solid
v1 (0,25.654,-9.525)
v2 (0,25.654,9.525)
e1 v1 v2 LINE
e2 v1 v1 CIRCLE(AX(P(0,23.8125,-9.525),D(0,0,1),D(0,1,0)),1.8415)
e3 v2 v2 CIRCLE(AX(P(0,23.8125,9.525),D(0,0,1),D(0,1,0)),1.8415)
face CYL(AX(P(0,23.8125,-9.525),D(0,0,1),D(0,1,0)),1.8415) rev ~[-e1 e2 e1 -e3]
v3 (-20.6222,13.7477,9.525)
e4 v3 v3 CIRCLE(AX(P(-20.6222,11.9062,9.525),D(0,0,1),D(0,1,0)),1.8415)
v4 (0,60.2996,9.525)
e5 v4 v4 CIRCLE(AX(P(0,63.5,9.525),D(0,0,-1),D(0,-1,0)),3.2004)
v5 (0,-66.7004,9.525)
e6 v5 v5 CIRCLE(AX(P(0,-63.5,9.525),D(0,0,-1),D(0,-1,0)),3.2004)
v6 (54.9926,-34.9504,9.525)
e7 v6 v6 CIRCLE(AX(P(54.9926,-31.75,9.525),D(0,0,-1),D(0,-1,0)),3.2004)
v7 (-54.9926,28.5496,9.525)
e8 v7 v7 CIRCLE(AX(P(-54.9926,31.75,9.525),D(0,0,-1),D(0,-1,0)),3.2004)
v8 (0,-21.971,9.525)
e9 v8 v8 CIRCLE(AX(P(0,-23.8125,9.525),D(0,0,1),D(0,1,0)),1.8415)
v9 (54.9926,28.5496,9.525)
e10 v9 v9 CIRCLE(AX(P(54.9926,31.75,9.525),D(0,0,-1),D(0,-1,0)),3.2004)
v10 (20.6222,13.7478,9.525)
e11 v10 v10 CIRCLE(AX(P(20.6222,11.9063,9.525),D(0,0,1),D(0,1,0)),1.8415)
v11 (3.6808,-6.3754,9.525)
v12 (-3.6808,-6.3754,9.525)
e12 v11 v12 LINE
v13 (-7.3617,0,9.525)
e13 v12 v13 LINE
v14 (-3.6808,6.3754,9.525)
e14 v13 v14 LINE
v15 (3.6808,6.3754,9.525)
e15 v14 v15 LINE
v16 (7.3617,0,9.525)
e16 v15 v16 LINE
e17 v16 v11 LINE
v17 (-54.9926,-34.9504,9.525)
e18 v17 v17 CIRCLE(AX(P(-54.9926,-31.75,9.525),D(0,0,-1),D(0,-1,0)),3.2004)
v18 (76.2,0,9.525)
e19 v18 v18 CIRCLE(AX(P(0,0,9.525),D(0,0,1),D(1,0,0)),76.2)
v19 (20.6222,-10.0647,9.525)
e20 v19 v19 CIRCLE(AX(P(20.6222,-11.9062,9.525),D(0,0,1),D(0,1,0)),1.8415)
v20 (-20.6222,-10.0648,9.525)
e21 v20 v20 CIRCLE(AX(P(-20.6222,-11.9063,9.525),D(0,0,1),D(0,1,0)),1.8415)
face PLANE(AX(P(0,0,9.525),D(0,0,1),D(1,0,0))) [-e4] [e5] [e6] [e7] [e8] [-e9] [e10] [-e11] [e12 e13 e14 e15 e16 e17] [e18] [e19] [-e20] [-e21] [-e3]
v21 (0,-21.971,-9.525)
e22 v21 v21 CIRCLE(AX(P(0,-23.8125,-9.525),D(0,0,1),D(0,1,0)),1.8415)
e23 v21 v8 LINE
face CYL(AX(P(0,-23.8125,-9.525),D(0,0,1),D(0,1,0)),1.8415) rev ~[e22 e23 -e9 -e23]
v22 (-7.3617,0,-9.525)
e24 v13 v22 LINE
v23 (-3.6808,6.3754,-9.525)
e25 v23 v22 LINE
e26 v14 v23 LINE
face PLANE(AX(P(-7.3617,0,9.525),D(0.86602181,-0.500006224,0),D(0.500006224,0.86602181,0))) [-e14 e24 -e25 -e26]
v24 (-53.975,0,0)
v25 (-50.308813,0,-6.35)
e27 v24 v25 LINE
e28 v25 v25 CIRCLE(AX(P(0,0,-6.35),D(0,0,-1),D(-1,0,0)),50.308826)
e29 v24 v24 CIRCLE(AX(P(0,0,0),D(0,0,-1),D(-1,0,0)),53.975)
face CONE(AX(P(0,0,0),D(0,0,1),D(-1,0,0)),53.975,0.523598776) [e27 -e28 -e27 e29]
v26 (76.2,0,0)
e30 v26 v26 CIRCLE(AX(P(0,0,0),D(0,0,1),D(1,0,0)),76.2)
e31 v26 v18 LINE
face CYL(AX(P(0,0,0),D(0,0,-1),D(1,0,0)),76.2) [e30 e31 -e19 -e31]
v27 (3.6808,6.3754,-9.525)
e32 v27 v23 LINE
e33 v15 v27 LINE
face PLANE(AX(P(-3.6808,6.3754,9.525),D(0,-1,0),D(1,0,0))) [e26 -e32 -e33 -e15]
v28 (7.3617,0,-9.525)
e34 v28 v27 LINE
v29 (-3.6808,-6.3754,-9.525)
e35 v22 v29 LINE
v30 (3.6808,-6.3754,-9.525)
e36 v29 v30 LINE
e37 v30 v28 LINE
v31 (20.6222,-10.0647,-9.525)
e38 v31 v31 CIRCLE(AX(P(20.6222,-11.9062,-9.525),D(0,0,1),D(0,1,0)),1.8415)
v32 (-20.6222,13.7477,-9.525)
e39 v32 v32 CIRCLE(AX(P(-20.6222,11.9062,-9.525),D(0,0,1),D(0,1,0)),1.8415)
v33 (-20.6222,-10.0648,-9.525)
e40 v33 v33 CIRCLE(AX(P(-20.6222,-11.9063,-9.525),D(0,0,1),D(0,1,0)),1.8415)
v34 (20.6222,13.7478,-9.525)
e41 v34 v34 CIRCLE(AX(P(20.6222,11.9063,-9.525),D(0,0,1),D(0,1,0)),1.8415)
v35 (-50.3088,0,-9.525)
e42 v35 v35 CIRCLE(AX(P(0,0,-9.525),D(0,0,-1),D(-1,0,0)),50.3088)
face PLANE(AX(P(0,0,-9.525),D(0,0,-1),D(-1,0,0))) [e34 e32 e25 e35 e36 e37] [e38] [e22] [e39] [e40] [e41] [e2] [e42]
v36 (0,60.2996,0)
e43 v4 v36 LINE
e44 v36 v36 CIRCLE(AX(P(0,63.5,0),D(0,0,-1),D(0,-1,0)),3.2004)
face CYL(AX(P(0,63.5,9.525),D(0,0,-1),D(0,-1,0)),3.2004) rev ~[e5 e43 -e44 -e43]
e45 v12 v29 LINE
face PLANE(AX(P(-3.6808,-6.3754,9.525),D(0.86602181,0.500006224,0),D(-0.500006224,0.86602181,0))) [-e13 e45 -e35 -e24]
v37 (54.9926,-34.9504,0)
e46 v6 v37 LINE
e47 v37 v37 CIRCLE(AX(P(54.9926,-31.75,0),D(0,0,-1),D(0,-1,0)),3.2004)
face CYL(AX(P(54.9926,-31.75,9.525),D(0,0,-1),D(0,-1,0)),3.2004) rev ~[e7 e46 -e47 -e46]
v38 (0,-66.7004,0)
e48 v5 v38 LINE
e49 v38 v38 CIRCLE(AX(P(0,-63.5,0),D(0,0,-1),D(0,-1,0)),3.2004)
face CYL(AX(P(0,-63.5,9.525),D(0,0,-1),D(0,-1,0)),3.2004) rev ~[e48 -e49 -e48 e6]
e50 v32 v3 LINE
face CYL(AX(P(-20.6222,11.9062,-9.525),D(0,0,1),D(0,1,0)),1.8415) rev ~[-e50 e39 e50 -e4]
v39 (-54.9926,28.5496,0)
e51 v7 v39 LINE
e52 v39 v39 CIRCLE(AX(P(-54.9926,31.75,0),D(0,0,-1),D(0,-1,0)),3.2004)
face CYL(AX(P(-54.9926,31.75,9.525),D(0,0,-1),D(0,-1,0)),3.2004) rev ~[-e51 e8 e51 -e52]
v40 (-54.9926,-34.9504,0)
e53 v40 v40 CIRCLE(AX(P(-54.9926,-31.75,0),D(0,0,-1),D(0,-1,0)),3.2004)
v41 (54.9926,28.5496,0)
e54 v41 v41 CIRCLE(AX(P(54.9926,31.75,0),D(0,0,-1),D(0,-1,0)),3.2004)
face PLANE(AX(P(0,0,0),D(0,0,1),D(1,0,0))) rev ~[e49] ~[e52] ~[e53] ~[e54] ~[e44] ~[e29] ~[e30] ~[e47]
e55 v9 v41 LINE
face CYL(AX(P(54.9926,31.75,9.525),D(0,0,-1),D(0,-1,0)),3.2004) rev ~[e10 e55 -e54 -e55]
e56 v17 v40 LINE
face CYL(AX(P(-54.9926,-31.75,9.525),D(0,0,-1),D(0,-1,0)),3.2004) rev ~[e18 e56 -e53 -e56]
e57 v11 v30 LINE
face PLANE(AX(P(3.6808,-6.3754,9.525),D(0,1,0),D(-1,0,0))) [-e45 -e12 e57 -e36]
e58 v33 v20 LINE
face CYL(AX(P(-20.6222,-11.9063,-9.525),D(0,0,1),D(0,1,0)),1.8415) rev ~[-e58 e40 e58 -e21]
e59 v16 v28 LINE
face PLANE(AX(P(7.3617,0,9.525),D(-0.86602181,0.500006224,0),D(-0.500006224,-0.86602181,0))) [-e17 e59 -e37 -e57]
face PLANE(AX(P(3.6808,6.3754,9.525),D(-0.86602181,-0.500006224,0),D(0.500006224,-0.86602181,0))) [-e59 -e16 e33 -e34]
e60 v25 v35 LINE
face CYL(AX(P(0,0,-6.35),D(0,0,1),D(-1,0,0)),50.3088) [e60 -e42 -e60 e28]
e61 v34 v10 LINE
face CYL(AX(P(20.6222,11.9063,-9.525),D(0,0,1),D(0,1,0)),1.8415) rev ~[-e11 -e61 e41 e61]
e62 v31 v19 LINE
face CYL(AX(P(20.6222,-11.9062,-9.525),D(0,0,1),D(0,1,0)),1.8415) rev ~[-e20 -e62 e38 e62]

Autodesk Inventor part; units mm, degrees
ref_plane "YZ Plane" through (0, 0, 0) normal (1, 0, 0) x (0, 1, 0)
ref_plane "XZ Plane" through (0, 0, 0) normal (0, 1, 0) x (-1, 0, 0)
ref_plane "XY Plane" through (0, 0, 0) normal (0, 0, 1) x (1, 0, 0)
sketch "Sketch1" plane through (0, 0, 0) normal (0, 0, 1) x (1, 0, 0)
  circle A0 centre (0, 0) radius 76.2
  dimension "d0" = 152.4
extrude "Extrusion1" add sketch "Sketch1" along normal blind 9.525
sketch "Sketch9" plane through (0, 0, 9.525) normal (0, 0, 1) x (1, 0, 0)
  circle A0 centre (0, 0) radius 76.2 projected
  point P0 (0, 63.5)
  point P1 (-54.9926, 31.75)
  point P2 (-54.9926, -31.75)
  point P3 (0, -63.5)
  point P4 (54.9926, -31.75)
  point P5 (54.9926, 31.75)
  dimension "d47" = 63.5
  dimension "d50" = 360
hole "Wheel Mount Holes" at (0, 63.5, 9.525) at (-54.9926, 31.75, 9.525) at (-54.9926, -31.75, 9.525) at (0, -63.5, 9.525) at (54.9926, -31.75, 9.525) at (54.9926, 31.75, 9.525) direction (0, 0, -1) diameter 6.4008 end through all thread size "5/16-18 UNC" class "2B" standard "ANSI Unified Screw Threads"
sketch "Sketch6" plane through (0, 0, 0) normal (0, 0, -1) x (-1, 0, 0)
  circle A0 centre (0, 0) radius 76.2 projected
  circle A1 centre (0, 0) radius 53.975
  dimension "d59" = 107.95
extrude "Extrusion4" add sketch "Sketch6" along normal blind 6.35 draft -30 contours A1
sketch "Sketch10" plane through (0, 0, -6.35) normal (0, 0, -1) x (-1, 0, 0)
  circle A0 centre (0, 0) radius 50.3088 projected
extrude "Extrusion6" add sketch "Sketch10" along normal blind 3.175
sketch "Sketch11" plane through (0, 0, -9.525) normal (0, 0, -1) x (-1, 0, 0)
  circle A0 centre (0, 0) radius 50.3088 projected
  point P0 (0, 23.8125)
  point P1 (-20.6222, 11.9063)
  point P2 (-20.6222, -11.9062)
  point P3 (0, -23.8125)
  point P4 (20.6222, -11.9063)
  point P5 (20.6222, 11.9062)
  dimension "d62" = 23.8125
  dimension "d65" = 360
hole "Sprocket Mount Holes" at (0, 23.8125, -9.525) at (20.6222, 11.9063, -9.525) at (20.6222, -11.9062, -9.525) at (0, -23.8125, -9.525) at (-20.6222, -11.9063, -9.525) at (-20.6222, 11.9062, -9.525) direction (0, 0, 1) diameter 3.683 end through all thread size "10-24 UNC" class "2B" standard "ANSI Unified Screw Threads"
sketch "Sketch12" plane through (0, 0, 9.525) normal (0, 0, 1) x (1, 0, 0)
  circle A0 centre (0, 0) radius 76.2 projected
  line L0 (3.6808, 6.3754) -> (7.3617, 0)
  line L1 (7.3617, 0) -> (3.6808, -6.3754)
  line L2 (3.6808, -6.3754) -> (-3.6808, -6.3754)
  line L3 (-3.6808, -6.3754) -> (-7.3617, 0)
  line L4 (-7.3617, 0) -> (-3.6808, 6.3754)
  line L5 (-3.6808, 6.3754) -> (3.6808, 6.3754)
  point P0 (0, 6.3754)
  dimension "d74" = 12.7508
extrude "Hex Bore" cut sketch "Sketch12" against normal through all contours L0 L1 L2 L3 L4 L5
properties part number "hub"
